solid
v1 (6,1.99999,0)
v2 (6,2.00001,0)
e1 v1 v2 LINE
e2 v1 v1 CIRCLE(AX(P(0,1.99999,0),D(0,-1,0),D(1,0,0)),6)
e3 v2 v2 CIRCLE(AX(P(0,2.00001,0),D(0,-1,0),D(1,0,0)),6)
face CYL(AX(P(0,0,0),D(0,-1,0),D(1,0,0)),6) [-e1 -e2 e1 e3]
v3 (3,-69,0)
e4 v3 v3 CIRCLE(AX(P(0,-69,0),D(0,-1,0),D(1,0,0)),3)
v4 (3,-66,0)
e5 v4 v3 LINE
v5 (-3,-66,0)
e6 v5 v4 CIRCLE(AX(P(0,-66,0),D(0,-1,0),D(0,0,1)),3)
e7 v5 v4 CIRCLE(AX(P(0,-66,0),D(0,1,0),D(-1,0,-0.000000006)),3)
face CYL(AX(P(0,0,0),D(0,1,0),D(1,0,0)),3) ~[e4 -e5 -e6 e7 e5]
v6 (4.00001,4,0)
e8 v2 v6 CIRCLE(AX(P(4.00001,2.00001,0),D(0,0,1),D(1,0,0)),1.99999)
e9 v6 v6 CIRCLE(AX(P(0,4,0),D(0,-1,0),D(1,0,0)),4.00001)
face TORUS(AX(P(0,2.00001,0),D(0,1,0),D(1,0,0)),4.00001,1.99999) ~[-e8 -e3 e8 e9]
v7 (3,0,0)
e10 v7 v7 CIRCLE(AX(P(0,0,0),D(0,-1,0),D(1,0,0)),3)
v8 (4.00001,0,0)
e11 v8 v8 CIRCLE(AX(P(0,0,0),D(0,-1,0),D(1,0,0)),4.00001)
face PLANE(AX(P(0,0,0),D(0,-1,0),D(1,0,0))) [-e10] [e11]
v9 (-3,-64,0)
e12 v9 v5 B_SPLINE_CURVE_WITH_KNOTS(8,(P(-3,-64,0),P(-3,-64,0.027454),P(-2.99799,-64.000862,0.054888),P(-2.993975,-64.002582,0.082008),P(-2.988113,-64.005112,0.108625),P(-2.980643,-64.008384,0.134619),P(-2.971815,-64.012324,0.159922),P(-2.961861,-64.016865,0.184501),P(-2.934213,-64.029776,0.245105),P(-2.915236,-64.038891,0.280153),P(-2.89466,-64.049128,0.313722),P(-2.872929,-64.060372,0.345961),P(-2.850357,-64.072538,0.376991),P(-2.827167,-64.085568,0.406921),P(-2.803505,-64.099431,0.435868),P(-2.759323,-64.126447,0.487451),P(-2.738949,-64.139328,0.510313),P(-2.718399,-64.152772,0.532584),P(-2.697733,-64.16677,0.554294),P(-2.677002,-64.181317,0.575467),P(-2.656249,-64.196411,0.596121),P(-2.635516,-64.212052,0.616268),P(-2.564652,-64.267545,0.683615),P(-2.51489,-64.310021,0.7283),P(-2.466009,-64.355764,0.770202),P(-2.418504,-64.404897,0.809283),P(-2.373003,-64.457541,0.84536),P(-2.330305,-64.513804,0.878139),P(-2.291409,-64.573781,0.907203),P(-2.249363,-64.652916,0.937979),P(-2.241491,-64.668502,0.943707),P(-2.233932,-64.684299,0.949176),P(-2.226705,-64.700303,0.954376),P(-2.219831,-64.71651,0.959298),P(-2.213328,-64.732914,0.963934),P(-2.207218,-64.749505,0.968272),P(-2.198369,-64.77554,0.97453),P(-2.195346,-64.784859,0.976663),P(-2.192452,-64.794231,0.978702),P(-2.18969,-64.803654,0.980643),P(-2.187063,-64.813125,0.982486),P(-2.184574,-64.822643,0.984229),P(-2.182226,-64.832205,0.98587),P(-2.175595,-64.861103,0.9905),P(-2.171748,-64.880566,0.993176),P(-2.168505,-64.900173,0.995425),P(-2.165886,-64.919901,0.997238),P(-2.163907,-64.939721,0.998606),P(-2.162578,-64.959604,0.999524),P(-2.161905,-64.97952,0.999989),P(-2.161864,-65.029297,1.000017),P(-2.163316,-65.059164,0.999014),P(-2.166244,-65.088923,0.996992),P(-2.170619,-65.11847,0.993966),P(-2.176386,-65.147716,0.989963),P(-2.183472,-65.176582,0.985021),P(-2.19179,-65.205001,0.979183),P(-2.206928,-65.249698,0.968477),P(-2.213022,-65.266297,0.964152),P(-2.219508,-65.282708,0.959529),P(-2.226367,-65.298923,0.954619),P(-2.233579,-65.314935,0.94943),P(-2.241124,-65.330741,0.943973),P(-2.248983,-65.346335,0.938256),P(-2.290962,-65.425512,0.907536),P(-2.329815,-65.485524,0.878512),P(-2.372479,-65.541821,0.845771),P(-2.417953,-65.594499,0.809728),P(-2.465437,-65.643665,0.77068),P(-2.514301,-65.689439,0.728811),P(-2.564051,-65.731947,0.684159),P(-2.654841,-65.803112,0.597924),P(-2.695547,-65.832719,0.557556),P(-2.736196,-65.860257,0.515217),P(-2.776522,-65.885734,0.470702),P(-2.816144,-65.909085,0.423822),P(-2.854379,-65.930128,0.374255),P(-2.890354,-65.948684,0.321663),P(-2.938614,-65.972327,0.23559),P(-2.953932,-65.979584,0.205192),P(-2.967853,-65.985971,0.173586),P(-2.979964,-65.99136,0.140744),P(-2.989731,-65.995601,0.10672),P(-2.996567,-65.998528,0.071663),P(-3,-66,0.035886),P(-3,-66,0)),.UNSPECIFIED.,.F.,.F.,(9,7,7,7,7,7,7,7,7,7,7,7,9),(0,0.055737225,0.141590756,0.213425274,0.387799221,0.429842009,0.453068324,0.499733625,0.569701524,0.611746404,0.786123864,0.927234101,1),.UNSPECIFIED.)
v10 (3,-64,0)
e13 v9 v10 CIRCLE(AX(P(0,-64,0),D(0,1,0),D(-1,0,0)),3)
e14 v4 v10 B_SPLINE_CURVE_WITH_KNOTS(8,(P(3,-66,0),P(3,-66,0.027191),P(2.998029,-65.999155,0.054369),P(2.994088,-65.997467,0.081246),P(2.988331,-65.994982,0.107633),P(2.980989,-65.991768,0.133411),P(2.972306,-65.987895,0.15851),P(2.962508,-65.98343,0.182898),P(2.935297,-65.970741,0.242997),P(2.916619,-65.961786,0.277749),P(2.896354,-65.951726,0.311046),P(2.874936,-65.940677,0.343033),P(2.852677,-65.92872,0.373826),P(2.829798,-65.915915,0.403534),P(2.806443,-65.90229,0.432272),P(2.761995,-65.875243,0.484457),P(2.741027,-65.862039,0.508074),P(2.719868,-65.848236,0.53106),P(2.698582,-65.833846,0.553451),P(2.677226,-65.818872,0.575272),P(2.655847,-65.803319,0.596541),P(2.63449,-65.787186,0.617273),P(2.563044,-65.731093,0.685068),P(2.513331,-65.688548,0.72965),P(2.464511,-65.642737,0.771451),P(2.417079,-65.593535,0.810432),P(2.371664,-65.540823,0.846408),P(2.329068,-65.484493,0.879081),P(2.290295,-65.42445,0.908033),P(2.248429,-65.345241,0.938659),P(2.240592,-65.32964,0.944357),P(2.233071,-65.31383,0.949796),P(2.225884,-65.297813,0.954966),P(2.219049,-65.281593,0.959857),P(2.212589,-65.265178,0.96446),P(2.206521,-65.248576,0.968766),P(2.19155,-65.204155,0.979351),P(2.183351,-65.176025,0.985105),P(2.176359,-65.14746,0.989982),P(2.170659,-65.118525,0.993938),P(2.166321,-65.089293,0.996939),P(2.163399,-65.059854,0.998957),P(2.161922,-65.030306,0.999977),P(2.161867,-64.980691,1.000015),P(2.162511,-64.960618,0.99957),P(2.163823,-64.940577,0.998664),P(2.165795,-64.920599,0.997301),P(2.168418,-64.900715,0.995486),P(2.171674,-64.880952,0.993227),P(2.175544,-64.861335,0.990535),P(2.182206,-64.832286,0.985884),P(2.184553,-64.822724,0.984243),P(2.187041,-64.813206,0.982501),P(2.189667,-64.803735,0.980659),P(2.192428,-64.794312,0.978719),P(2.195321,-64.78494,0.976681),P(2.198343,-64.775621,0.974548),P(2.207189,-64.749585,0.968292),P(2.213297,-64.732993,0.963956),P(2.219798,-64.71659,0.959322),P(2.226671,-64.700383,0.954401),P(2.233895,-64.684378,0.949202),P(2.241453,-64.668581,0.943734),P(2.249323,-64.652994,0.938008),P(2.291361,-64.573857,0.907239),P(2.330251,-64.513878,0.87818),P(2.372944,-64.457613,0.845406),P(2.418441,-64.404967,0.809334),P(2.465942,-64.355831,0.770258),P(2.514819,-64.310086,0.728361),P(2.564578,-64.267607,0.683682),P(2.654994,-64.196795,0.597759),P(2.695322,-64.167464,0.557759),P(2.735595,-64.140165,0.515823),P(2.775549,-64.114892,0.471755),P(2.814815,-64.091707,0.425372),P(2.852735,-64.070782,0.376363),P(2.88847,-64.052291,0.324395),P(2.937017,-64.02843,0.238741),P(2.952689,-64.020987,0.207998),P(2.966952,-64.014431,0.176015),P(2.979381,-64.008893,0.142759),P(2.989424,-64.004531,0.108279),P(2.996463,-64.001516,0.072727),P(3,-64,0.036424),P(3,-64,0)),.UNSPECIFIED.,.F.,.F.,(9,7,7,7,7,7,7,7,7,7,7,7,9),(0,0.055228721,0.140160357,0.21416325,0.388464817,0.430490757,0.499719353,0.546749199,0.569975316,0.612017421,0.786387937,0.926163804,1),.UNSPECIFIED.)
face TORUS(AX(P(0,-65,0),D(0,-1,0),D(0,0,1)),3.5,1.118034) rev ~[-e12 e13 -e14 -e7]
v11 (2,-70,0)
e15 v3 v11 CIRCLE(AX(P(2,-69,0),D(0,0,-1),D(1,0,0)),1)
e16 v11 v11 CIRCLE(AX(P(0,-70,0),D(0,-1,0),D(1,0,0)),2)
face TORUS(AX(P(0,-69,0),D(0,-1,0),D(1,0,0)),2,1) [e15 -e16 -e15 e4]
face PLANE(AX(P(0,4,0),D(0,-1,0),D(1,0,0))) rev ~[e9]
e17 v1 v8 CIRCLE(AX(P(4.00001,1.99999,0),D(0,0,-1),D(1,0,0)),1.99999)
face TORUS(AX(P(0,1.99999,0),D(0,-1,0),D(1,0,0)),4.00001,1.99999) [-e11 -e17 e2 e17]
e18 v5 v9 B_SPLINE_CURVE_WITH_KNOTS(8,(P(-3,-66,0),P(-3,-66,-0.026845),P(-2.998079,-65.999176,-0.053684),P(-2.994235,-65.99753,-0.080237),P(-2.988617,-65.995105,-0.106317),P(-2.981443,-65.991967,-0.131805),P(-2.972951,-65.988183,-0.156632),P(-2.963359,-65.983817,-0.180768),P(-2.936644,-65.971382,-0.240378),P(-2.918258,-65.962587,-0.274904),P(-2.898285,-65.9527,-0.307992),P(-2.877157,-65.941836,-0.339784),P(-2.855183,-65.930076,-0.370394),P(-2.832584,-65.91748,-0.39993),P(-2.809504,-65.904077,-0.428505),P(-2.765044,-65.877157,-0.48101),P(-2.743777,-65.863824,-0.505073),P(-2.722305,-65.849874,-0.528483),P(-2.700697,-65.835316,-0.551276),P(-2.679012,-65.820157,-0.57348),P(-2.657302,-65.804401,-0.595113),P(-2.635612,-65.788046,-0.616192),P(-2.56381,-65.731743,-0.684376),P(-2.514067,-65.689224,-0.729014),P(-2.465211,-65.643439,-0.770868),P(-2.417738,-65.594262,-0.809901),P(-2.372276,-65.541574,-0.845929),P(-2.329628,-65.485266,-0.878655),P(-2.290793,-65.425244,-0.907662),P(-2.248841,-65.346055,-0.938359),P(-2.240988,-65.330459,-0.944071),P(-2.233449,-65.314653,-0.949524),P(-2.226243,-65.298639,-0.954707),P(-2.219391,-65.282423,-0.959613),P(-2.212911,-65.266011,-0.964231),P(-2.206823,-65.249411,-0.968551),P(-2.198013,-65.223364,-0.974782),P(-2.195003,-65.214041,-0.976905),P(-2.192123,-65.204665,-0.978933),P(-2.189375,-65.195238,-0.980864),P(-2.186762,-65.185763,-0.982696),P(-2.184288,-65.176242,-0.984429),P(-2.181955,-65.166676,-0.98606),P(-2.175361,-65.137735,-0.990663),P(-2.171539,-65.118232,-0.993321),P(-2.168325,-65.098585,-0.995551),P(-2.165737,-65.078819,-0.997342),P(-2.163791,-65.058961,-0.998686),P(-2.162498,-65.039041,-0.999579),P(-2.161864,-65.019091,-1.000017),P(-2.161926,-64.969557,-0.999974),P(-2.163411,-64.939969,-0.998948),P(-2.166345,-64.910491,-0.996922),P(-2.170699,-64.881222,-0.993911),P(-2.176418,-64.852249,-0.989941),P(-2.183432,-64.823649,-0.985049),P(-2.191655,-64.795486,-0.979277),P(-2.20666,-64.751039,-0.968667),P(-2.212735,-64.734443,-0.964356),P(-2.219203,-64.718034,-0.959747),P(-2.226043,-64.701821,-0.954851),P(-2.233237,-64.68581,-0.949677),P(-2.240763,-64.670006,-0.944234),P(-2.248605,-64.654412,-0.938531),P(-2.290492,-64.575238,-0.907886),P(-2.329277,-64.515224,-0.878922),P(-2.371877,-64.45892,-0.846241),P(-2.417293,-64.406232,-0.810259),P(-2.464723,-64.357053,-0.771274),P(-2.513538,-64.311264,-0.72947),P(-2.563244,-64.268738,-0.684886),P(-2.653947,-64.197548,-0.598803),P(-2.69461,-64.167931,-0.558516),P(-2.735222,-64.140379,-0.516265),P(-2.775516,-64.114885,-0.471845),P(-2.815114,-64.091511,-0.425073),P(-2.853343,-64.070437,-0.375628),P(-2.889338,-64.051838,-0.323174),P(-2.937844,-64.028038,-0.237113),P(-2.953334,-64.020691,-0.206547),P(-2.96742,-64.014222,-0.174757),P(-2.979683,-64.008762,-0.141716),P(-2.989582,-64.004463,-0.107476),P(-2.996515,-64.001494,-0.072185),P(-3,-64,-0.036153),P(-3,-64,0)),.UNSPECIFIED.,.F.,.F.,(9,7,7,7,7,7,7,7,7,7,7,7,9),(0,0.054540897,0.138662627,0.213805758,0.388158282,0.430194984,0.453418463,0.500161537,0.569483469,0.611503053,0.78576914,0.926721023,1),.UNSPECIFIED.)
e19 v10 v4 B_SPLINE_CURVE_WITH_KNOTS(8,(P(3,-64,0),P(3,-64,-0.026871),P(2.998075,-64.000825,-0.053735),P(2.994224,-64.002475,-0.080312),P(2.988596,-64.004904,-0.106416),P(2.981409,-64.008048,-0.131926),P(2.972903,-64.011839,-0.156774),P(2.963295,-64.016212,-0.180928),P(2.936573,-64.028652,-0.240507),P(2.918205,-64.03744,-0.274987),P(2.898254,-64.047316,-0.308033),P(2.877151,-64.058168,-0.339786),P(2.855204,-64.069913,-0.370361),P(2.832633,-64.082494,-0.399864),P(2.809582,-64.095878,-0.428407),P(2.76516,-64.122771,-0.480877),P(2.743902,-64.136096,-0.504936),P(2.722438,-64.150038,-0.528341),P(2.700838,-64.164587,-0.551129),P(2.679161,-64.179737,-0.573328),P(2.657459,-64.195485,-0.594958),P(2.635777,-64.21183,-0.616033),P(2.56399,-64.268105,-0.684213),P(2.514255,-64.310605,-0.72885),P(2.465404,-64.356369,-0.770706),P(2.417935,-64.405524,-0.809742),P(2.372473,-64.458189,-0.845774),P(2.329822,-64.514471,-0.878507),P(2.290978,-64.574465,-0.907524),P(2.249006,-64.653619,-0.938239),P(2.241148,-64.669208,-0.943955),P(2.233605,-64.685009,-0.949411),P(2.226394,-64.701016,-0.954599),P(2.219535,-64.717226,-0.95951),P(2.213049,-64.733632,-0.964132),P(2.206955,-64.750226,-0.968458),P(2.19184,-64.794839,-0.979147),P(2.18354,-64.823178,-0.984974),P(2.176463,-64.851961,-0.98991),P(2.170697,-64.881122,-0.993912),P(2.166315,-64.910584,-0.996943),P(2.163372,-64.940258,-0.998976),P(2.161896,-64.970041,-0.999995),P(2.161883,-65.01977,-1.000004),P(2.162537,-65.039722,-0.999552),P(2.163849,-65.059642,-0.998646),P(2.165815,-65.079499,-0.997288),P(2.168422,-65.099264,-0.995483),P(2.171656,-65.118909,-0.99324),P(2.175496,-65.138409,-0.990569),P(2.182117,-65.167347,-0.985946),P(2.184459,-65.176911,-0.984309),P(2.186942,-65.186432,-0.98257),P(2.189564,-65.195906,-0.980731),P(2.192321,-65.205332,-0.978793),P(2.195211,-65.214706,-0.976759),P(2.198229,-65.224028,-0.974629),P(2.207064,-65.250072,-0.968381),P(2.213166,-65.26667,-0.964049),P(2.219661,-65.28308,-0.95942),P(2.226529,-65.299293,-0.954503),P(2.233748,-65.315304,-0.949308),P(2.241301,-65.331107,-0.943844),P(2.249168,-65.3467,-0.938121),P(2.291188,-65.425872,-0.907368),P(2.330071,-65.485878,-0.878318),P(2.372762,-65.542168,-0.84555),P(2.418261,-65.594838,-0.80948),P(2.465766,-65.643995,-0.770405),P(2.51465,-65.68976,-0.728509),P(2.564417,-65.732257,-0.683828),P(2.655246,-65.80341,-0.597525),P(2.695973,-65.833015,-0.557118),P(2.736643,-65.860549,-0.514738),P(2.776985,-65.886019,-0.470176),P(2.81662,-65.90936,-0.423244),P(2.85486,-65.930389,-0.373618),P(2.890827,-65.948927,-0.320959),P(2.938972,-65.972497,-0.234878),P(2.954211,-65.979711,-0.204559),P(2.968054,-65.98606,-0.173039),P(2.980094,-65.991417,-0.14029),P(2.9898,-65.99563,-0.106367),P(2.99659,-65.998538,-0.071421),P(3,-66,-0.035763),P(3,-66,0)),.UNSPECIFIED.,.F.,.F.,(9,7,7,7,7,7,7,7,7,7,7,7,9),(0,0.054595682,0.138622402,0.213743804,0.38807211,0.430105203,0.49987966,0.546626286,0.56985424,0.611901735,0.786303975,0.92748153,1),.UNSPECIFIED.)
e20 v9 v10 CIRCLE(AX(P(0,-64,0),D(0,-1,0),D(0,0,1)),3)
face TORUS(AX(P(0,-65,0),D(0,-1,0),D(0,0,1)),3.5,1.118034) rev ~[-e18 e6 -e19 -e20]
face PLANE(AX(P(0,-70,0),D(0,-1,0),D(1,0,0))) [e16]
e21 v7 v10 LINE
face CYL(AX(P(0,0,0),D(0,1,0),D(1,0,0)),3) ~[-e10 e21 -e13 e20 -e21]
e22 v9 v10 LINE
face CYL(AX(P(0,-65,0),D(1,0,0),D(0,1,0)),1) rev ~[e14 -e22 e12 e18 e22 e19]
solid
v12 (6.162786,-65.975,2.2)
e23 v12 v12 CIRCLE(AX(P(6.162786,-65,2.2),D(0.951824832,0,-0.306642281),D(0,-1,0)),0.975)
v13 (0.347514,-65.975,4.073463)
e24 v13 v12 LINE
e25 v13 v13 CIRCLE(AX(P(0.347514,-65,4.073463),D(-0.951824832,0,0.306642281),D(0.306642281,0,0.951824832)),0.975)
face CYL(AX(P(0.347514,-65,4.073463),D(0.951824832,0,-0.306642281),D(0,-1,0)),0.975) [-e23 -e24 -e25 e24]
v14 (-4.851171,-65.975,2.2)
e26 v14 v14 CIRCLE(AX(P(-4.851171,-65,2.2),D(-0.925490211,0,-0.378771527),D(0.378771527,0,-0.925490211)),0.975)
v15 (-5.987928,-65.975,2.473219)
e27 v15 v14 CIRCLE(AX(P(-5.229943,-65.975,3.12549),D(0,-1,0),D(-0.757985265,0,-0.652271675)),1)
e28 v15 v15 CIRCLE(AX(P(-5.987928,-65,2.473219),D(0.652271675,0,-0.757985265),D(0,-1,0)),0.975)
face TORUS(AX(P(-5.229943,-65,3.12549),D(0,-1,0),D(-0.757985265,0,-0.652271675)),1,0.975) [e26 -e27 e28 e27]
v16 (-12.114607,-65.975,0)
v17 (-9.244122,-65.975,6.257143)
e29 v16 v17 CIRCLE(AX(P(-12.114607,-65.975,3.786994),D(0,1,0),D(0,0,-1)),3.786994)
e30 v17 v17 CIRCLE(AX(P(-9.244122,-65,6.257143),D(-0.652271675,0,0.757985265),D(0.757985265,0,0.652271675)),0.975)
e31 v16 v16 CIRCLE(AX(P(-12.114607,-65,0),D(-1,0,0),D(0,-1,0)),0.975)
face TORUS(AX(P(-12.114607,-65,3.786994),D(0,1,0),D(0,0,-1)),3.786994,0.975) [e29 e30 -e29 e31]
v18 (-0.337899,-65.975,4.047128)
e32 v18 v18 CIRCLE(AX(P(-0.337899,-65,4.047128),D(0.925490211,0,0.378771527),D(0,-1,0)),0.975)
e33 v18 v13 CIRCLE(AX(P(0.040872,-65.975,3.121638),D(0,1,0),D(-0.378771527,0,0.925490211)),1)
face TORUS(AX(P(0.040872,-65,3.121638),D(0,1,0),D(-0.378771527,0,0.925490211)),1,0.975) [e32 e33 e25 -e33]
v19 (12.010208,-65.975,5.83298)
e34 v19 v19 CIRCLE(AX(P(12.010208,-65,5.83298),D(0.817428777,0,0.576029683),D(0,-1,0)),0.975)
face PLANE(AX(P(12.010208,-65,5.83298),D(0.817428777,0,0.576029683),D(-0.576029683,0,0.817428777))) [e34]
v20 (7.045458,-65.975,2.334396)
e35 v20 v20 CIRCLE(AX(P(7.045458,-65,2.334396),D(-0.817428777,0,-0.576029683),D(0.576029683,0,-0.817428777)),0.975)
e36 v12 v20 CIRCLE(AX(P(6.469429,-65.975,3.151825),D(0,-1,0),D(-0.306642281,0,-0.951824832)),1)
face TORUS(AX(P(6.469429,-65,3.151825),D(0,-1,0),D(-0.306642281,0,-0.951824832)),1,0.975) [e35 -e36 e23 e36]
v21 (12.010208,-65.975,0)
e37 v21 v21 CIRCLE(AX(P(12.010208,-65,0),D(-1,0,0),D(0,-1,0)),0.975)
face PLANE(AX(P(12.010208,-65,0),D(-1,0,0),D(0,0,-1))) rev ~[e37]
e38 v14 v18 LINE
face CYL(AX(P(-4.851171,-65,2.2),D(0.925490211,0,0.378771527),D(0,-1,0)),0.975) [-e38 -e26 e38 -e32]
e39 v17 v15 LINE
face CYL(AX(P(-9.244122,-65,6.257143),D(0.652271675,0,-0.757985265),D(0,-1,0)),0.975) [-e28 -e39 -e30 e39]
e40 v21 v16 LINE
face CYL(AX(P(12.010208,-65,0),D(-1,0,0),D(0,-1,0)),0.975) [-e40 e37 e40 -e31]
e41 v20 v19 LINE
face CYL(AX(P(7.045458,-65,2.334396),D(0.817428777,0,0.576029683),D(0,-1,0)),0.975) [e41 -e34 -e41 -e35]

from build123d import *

# Parameters (mm, degrees)
F0_R     = 3
F1_DEPTH = 70
F0_R_2   = 6
F2_DEPTH = 4
F3_R     = 1.99999
F4_R     = 1
F5_R     = 1
F6_DEPTH = 3
F11_R    = 0.975


# Not quite as in the source:
# - a fillet or chamfer is up to 0.001 mm smaller than in the source, because OpenCascade refuses the exact size


with BuildPart() as f1:
    # F0 (on Front) → F1 (new body)
    with BuildSketch(Plane.XZ):
        Circle(F0_R)
    extrude(amount=F1_DEPTH)

    # F0 (on Front) → F2 (join)
    with BuildSketch(Plane.XZ):
        Circle(F0_R_2)
        Circle(F0_R, mode=Mode.SUBTRACT)
        Circle(F0_R)
    extrude(amount=-F2_DEPTH)

    # F3 (radius 2 in the source; OpenCascade refuses exactly that, so slightly less here)
    f3_edges = [f1.edges().sort_by_distance(p)[0] for p in [
        (-6, 4, 0),
        (-6, 0, 0),
    ]]
    fillet(f3_edges, radius=F3_R)

    # F4
    f4_edges = [f1.edges().sort_by_distance(p)[0] for p in [
        (-3, -70, 0),
    ]]
    fillet(f4_edges, radius=F4_R)

    # F5 (on Right) → F6 (cut, symmetric)
    with BuildSketch(Plane.YZ):
        with Locations((-65, 0)):
            Circle(F5_R)
    extrude(amount=F6_DEPTH, both=True, mode=Mode.SUBTRACT)

    # F5 (on Right) → F7 (revolve, cut)
    with BuildSketch(Plane.YZ):
        with BuildLine():
            ThreePointArc((-66, 3), (-65, 2.3819660113), (-64, 3))
            Line((-64, 3), (-66, 3))
        make_face()
    revolve(axis=Axis((0, -46.4799346625, 0), (0, -1, 0)), mode=Mode.SUBTRACT)


with BuildPart() as f12:
    # F12: sweep along a path in F9
    with BuildLine(Plane.XZ.offset(65)) as f12_path:
        Line((12.010208331, 0), (-12.1146072416, 0))
        ThreePointArc((-12.1146072416, 0), (-15.5566823668, 5.3660576736), (-9.2441216111, 6.2571428716))
        Line((-9.2441216111, 6.2571428716), (-5.987928152, 2.4732185361))
        ThreePointArc((-5.987928152, 2.4732185361), (-5.4636368252, 2.1531800014), (-4.8511713594, 2.2))
        Line((-4.8511713594, 2.2), (-0.3378994762, 4.0471280022))
        ThreePointArc((-0.3378994762, 4.0471280022), (0.002478886, 4.1209005021), (0.347514332, 4.0734626238))
        Line((0.347514332, 4.0734626238), (6.1627862583, 2.2))
        ThreePointArc((6.1627862583, 2.2), (6.6199541782, 2.1632187268), (7.0454582218, 2.3343960558))
        Line((7.0454582218, 2.3343960558), (12.010208331, 5.8329802886))
    # F11 (on line) → F12 (sweep)
    with BuildSketch(Plane(origin=(12.010208331, 0, 0), x_dir=(0, -1, 0), z_dir=(-1, 0, 0))):
        with Locations((65, 0)):
            Circle(F11_R)
    sweep(path=f12_path.line)


solid = Compound([f1.part, f12.part])
